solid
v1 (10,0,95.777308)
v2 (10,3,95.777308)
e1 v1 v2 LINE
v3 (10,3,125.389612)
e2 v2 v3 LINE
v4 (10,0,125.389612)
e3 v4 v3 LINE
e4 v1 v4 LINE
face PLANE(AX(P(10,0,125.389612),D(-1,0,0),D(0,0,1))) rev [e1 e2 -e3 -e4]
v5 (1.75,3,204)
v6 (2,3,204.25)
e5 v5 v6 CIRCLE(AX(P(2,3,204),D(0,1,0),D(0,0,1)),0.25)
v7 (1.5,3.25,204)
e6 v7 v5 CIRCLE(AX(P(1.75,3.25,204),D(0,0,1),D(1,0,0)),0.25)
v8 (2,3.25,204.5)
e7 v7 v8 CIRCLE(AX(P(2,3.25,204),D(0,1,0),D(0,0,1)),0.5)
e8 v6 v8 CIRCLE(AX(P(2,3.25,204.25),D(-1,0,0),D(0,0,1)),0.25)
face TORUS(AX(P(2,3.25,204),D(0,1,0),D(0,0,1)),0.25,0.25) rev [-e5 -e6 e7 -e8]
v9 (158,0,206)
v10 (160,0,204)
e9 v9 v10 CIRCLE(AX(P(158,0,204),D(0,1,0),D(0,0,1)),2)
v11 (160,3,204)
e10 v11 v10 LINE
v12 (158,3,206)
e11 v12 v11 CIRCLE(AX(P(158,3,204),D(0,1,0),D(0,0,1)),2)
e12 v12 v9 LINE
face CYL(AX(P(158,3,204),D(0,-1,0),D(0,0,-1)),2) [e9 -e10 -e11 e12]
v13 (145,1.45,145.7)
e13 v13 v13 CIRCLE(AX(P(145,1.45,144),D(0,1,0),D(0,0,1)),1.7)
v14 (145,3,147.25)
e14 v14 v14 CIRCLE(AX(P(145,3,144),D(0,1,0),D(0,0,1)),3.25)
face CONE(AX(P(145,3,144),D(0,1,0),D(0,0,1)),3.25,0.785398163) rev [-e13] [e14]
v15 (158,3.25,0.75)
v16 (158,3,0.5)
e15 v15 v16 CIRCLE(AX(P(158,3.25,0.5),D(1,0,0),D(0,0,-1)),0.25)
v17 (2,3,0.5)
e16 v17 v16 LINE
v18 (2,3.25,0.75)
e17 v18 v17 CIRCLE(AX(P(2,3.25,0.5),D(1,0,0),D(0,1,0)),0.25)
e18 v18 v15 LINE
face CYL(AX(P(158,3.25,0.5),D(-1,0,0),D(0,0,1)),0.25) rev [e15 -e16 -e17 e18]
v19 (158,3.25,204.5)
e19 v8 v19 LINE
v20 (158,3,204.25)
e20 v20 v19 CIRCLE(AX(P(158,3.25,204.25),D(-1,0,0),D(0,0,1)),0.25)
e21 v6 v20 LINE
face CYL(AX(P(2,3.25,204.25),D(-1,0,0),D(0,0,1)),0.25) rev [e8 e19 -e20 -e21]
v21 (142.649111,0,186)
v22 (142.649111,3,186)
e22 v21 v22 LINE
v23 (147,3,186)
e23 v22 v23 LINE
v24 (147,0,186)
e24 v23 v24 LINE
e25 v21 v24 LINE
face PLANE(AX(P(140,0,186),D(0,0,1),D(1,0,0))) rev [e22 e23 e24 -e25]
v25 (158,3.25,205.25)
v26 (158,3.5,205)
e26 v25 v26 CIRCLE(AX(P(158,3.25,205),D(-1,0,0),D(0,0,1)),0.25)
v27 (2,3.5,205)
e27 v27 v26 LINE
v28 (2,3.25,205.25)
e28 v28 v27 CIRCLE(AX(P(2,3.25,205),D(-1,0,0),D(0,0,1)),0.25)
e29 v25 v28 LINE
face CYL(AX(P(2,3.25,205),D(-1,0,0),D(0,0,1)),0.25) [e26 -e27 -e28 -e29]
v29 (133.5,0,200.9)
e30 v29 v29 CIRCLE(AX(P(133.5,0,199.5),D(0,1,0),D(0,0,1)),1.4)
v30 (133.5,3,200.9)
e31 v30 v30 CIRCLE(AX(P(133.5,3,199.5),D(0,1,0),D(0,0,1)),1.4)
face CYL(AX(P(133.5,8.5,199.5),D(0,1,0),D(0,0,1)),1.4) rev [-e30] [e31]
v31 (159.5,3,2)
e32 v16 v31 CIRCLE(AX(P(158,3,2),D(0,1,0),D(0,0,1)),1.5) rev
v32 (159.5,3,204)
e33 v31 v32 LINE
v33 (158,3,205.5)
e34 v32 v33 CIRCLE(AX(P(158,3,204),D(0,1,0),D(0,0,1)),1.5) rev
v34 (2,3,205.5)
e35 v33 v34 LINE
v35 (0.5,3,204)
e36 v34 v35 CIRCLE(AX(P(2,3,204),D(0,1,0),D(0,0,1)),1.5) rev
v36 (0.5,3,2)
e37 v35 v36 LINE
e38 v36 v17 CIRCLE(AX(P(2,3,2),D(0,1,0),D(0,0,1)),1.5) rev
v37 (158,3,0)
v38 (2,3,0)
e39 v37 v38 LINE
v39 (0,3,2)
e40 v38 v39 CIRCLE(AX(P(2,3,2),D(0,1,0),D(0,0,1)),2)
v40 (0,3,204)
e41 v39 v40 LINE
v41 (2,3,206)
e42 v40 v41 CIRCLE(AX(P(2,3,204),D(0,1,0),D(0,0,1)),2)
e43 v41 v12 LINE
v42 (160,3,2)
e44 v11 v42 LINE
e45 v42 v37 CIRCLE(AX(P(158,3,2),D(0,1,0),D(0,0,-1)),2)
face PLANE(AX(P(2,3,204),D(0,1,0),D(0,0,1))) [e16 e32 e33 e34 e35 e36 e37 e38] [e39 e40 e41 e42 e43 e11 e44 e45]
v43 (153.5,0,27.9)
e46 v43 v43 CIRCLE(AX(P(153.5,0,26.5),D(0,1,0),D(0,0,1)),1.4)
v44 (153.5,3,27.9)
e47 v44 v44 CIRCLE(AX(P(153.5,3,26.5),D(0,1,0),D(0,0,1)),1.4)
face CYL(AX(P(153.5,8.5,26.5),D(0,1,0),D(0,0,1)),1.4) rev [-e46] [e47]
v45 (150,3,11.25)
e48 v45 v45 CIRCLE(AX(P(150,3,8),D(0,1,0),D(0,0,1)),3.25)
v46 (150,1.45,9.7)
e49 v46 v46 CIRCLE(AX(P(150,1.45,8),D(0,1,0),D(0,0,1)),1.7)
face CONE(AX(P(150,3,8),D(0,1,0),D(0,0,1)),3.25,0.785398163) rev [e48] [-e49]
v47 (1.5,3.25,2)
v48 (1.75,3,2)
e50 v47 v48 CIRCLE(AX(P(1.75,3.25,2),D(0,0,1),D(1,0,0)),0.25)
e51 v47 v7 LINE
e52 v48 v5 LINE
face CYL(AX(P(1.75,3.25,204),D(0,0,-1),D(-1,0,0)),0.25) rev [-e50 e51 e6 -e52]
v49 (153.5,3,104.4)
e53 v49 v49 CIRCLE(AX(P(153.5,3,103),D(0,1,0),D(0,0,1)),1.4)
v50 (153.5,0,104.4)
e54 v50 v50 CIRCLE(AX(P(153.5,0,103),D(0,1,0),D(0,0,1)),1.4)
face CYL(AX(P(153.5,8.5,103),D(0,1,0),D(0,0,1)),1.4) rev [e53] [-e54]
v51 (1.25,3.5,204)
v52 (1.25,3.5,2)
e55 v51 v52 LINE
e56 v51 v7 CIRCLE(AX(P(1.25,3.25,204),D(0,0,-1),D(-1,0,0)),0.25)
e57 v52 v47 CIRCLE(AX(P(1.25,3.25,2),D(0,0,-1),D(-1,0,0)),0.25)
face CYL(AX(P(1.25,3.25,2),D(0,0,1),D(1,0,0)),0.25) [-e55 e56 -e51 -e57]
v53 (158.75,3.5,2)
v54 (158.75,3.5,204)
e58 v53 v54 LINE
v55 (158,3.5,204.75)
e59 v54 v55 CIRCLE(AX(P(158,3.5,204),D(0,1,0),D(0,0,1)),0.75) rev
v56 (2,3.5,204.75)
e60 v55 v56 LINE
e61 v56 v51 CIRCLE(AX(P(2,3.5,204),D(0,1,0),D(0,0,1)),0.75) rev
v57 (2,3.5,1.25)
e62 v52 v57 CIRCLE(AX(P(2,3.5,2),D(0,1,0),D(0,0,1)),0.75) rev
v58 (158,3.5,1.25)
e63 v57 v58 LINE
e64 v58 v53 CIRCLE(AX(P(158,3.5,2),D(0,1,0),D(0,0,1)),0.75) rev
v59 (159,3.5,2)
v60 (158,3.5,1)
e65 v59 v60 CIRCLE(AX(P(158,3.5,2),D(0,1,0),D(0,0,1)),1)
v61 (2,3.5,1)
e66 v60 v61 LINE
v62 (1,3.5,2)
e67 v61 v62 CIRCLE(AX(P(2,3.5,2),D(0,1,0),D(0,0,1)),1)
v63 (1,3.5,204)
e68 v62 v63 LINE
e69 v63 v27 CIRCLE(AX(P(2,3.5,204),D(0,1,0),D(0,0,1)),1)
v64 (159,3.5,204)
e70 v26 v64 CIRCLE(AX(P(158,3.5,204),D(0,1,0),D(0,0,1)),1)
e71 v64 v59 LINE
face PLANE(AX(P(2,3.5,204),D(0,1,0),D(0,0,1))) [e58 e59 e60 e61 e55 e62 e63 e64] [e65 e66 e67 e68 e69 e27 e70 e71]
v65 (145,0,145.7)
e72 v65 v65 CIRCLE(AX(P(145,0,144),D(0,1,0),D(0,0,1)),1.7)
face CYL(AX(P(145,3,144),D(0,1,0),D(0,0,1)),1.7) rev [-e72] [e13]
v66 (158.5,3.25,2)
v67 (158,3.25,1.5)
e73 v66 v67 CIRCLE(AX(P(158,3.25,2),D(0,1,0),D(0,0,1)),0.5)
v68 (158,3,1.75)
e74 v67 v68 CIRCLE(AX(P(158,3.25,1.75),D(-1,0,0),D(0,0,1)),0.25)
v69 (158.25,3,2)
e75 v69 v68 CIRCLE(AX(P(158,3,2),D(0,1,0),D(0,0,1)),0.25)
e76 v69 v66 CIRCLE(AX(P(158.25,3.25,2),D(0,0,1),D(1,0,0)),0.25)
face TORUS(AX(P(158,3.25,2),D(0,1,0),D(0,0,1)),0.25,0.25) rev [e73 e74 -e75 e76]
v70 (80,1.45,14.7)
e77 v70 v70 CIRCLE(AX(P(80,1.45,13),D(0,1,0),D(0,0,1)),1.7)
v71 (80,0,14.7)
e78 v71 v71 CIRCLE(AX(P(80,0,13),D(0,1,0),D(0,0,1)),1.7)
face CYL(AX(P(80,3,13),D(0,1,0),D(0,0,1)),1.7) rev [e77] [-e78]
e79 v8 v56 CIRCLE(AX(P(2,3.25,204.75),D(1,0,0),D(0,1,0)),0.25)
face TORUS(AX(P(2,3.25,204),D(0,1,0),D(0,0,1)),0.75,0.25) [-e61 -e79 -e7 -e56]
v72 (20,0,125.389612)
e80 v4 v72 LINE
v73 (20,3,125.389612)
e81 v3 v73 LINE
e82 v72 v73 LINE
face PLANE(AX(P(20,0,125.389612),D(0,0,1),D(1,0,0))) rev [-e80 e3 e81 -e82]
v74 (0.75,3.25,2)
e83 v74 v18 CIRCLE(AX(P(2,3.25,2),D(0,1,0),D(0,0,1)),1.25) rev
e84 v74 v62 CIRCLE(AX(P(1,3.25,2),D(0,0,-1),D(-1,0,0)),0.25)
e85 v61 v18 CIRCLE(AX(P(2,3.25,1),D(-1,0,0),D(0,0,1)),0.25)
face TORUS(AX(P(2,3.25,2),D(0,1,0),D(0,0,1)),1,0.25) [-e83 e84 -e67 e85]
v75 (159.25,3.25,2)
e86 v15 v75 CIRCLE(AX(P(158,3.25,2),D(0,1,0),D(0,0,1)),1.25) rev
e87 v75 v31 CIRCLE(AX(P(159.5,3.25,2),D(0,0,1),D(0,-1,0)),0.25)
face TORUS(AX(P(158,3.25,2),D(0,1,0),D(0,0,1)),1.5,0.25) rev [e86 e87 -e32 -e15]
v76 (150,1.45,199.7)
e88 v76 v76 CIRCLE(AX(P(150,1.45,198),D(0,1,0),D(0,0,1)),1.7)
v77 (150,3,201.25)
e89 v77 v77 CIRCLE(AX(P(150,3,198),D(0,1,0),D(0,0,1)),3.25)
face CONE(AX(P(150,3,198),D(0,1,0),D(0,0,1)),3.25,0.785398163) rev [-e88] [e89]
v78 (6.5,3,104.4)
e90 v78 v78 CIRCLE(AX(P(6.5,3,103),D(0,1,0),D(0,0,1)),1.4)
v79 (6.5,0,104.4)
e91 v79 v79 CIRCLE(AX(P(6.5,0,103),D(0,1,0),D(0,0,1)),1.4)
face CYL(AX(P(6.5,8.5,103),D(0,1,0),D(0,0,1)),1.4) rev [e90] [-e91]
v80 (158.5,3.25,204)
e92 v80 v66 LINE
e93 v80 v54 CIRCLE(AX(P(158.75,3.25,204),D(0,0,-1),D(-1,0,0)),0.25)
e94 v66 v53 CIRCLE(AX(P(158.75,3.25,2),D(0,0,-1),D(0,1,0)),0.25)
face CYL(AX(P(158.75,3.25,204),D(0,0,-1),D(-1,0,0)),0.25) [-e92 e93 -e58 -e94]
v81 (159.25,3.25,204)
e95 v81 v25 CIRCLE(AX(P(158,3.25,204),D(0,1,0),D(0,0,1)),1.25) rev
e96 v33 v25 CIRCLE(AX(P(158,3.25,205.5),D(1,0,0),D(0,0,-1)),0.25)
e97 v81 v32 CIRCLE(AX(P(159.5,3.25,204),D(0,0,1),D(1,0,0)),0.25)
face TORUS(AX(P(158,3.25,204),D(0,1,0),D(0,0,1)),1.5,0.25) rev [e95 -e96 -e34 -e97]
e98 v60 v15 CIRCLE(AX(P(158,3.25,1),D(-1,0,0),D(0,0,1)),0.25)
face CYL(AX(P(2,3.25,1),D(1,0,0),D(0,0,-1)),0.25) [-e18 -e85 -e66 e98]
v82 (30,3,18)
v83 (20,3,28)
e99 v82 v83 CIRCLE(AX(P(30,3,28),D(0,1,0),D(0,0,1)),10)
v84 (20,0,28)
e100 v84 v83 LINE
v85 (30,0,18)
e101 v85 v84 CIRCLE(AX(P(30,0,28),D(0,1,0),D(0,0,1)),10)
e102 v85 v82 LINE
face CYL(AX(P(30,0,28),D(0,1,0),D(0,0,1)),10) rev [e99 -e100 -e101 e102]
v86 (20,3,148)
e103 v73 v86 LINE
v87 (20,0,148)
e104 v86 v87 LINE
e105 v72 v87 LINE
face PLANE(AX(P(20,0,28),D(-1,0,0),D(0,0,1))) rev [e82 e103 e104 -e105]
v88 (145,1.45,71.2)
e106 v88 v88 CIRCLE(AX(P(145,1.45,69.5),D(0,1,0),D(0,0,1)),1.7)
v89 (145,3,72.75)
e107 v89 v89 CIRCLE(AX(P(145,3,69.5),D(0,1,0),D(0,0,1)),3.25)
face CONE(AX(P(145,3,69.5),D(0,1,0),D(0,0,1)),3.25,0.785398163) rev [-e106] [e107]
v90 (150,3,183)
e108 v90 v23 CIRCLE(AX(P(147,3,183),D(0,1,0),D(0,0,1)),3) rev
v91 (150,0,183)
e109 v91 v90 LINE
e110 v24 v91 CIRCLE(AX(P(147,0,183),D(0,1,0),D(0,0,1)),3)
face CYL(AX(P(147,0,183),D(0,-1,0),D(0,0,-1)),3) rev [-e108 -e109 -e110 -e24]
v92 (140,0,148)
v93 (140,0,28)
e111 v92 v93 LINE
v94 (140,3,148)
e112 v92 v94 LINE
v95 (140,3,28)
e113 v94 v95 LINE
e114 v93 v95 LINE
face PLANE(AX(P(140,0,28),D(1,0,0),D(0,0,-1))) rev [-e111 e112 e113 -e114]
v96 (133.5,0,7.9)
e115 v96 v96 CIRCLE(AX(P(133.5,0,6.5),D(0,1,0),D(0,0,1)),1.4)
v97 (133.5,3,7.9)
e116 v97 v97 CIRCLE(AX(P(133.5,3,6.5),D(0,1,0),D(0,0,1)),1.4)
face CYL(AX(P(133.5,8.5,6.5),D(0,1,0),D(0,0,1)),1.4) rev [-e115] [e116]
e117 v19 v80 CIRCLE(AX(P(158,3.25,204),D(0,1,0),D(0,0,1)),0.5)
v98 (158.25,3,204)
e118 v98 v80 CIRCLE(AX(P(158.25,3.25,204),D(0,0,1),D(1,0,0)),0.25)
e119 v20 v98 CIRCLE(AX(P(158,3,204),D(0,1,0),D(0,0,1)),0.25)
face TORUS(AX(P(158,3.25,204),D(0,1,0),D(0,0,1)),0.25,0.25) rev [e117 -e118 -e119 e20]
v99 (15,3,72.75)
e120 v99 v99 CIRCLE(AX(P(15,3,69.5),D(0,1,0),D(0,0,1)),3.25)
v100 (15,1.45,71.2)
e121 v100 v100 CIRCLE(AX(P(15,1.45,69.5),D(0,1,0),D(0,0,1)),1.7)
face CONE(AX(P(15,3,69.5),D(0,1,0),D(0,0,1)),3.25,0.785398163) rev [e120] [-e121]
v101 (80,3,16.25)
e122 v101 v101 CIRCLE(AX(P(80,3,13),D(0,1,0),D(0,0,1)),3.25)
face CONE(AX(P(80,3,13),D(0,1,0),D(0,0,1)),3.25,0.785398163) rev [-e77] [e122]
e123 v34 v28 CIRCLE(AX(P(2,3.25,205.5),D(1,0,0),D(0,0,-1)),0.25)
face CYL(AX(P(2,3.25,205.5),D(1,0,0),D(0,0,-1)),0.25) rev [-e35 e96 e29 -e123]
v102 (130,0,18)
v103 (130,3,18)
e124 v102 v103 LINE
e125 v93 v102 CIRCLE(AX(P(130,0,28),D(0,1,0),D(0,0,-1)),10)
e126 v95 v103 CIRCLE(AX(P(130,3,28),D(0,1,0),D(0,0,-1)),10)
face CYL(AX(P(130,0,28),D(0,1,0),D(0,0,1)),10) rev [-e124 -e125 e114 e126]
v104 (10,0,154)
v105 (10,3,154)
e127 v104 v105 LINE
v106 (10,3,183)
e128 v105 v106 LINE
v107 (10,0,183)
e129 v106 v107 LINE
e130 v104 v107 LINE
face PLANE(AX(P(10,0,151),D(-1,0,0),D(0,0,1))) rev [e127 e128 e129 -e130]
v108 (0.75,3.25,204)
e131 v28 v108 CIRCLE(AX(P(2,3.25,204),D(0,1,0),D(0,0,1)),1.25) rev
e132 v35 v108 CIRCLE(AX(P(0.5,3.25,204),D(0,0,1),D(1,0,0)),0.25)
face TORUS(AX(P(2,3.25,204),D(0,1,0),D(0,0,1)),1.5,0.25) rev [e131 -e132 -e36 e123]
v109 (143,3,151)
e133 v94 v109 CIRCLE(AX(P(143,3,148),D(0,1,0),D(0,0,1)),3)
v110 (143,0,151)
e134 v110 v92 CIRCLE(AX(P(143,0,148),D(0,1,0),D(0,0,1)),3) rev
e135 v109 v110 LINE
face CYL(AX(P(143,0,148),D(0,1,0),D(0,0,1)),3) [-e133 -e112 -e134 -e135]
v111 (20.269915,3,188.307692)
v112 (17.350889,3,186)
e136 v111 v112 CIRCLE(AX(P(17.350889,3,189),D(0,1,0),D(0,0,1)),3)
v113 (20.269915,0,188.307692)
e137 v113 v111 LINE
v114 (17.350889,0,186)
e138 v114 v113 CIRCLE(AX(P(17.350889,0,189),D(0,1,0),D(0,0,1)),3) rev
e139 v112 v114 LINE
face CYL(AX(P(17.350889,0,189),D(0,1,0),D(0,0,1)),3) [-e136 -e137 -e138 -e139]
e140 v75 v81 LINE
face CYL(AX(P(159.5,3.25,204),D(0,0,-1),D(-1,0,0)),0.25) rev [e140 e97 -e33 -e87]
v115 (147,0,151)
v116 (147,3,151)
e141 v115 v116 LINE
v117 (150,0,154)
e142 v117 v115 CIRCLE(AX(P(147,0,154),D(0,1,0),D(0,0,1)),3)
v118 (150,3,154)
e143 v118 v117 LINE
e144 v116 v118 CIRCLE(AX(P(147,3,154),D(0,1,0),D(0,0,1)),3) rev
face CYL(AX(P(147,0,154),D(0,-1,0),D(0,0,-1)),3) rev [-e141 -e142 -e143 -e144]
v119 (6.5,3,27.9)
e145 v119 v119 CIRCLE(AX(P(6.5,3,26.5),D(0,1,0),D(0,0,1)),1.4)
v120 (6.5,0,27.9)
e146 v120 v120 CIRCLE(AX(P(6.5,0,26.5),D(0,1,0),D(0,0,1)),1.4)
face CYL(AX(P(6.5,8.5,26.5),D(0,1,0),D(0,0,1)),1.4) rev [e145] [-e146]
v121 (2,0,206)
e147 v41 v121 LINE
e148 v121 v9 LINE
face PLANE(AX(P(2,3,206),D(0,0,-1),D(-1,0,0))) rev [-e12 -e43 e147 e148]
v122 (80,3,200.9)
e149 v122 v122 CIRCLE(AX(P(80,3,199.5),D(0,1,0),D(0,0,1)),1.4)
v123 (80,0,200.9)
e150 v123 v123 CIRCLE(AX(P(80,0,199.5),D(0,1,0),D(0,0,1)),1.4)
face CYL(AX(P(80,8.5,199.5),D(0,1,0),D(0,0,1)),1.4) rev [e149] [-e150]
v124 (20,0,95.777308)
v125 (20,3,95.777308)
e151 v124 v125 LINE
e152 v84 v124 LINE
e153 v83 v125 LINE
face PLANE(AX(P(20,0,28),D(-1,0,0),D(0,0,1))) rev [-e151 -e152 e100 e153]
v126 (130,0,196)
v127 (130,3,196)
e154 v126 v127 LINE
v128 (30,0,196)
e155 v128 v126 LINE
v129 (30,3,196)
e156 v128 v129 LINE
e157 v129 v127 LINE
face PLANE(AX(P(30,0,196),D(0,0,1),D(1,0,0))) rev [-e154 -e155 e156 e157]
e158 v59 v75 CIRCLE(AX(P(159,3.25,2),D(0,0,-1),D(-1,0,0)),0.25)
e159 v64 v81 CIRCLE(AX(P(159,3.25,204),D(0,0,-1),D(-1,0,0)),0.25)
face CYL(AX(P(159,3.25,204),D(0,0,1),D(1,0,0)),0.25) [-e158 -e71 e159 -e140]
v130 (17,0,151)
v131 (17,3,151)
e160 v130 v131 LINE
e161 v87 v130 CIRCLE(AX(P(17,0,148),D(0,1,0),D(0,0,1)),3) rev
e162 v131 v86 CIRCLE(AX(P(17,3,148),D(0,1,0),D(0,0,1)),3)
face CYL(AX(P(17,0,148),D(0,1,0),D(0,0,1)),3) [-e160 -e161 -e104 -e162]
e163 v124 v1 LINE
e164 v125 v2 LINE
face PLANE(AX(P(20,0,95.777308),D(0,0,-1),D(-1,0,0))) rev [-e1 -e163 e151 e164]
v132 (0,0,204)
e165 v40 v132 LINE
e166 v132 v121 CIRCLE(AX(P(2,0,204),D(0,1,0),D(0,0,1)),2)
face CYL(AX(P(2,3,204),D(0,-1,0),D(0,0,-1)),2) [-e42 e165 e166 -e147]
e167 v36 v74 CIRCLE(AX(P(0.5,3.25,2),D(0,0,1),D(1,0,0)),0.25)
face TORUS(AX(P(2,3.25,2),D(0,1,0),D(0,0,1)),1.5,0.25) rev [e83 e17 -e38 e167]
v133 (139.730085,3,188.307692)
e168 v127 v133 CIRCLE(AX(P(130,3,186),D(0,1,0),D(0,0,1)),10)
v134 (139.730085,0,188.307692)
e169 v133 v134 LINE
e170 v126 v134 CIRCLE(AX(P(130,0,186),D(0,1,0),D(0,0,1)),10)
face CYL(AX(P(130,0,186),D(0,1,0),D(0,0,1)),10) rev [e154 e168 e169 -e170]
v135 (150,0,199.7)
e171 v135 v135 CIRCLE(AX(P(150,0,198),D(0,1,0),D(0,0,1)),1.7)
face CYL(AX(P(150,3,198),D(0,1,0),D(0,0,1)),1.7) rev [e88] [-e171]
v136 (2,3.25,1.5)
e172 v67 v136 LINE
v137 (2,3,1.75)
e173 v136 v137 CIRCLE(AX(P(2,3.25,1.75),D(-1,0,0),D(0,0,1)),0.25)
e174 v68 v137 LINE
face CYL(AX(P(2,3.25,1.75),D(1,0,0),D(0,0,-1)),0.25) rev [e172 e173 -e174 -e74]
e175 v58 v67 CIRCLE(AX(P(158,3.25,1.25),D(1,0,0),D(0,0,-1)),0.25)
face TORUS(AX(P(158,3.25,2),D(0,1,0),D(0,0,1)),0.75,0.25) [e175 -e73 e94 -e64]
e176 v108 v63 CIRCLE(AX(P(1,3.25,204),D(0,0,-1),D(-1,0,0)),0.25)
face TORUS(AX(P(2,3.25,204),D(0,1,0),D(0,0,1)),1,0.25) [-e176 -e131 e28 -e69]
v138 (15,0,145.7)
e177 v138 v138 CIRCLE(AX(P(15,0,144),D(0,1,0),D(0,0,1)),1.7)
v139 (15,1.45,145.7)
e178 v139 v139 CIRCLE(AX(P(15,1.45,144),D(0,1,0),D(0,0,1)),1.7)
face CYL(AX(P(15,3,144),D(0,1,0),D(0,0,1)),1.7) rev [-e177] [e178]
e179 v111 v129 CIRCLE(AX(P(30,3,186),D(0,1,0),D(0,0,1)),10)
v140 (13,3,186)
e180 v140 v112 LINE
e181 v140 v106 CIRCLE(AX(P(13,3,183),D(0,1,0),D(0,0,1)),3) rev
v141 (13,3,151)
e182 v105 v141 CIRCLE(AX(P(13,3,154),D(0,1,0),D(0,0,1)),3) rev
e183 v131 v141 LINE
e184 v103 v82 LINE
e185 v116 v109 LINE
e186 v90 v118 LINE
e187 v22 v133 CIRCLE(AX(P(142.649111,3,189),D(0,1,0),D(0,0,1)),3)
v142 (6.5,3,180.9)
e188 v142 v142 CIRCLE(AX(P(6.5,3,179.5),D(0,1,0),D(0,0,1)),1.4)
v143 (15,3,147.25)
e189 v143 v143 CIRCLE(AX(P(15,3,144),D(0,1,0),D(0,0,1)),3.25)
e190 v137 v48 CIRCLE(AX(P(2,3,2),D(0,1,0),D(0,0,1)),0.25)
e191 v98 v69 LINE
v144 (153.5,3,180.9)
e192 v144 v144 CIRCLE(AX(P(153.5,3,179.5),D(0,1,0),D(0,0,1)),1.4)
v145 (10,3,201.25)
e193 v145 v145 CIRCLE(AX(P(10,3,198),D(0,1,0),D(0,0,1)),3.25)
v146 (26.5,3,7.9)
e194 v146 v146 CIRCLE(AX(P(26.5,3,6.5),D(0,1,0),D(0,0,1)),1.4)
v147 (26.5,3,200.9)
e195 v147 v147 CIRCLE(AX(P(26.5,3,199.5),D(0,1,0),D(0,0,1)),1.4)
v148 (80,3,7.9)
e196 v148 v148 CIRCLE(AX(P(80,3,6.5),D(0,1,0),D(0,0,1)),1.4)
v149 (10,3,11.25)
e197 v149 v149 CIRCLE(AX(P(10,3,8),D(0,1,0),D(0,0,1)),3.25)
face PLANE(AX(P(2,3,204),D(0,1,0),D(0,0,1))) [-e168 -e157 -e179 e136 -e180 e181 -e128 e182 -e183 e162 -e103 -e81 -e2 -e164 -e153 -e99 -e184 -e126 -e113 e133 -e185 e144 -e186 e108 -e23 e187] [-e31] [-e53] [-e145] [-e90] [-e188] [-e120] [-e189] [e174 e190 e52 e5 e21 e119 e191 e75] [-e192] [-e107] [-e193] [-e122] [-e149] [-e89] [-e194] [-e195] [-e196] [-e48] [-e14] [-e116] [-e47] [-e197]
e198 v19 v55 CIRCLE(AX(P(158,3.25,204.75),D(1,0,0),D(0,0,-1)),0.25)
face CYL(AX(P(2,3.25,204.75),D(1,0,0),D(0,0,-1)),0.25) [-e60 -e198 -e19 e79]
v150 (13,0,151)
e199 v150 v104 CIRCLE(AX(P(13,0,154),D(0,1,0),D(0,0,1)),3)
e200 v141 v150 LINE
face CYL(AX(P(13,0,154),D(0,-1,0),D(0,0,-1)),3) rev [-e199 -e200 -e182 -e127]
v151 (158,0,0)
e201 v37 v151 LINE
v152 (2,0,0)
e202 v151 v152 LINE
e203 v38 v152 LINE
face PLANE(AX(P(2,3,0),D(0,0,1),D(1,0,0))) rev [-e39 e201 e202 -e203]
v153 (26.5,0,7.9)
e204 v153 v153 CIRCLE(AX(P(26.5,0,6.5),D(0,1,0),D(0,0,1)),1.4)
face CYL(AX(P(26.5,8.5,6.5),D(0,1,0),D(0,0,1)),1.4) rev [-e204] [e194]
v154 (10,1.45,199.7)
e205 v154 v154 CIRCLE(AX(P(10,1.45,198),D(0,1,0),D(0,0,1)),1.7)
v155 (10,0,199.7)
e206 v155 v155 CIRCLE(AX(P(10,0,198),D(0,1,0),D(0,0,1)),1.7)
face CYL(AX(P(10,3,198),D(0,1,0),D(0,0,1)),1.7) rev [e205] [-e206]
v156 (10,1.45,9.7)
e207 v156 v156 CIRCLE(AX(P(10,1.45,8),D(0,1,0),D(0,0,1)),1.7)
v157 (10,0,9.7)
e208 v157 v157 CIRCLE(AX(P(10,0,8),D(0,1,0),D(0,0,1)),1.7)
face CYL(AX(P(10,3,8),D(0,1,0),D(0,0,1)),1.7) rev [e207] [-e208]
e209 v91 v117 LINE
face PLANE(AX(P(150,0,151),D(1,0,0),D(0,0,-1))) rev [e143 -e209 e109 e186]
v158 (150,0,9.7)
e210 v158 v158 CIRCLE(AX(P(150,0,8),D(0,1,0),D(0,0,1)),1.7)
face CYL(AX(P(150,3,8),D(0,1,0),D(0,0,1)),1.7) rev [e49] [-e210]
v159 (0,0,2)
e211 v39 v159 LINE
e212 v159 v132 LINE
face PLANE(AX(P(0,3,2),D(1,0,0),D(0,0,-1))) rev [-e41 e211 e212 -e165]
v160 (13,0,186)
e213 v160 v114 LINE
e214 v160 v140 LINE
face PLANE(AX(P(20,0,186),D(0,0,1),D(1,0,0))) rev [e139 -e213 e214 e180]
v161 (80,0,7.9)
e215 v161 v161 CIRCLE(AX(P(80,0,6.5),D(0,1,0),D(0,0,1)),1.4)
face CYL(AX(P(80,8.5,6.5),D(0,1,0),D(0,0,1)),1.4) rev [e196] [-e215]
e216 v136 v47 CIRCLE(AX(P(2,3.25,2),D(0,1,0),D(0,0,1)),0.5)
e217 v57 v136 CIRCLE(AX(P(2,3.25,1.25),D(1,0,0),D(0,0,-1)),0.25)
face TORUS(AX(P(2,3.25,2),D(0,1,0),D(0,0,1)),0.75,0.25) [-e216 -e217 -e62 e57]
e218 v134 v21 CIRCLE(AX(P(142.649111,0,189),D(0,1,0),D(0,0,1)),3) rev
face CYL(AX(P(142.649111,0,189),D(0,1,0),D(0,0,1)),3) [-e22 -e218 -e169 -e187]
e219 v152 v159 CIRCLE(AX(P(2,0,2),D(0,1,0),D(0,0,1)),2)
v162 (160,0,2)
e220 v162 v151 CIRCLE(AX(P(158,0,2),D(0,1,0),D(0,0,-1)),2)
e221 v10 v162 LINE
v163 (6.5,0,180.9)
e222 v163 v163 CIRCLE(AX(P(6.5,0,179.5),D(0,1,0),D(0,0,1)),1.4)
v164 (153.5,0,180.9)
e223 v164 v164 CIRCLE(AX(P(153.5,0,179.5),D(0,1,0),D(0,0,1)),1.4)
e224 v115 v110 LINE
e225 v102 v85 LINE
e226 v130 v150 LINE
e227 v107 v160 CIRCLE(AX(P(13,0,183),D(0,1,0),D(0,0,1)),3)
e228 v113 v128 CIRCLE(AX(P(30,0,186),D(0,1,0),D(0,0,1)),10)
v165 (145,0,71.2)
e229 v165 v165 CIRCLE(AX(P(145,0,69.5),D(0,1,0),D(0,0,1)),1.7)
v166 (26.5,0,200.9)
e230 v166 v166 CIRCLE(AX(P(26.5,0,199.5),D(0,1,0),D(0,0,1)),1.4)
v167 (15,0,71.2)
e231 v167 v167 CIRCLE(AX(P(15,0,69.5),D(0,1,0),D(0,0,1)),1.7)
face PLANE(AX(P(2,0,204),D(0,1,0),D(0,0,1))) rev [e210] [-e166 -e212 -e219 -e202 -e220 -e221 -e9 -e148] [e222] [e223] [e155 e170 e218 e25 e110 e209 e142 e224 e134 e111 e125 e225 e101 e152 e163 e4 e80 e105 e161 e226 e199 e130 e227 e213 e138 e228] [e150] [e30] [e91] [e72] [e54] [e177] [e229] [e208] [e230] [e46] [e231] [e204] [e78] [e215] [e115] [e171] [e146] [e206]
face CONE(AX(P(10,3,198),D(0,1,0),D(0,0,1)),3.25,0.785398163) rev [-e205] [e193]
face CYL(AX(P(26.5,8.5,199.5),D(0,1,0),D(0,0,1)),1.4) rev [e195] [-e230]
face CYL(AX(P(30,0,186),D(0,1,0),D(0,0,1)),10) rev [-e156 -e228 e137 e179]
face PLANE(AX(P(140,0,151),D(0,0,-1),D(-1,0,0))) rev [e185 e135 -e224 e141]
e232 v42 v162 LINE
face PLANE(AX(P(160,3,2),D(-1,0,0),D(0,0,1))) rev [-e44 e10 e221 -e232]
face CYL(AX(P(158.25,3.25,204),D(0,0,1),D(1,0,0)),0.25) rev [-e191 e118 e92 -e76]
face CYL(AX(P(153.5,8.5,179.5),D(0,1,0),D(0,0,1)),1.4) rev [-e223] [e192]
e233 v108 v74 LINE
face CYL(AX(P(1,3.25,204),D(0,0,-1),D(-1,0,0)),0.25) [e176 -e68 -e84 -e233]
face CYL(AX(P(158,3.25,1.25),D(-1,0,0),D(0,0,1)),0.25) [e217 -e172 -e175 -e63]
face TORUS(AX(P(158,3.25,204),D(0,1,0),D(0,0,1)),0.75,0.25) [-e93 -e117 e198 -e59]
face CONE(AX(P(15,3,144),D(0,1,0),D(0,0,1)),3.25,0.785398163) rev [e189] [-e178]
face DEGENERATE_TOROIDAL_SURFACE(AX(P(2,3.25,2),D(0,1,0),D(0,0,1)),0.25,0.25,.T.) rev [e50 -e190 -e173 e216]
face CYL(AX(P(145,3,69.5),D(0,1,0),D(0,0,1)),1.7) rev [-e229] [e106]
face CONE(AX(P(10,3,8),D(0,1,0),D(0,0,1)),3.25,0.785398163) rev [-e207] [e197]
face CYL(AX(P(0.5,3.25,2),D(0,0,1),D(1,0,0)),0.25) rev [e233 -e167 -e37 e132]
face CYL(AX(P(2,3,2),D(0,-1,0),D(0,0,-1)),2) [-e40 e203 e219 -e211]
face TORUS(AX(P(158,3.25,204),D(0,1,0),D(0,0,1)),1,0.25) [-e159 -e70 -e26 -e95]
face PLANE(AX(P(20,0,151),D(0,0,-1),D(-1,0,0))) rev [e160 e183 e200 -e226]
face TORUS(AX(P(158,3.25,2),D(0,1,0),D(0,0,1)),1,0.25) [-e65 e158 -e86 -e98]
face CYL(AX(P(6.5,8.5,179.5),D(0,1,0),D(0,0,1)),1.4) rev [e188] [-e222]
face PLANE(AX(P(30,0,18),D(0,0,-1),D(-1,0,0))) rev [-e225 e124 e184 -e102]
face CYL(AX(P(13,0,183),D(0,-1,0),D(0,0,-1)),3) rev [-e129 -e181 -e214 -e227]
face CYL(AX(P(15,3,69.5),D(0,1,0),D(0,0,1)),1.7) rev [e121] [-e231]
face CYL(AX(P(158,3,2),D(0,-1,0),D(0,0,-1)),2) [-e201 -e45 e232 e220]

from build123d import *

# Parameters (mm, degrees)
BOSS_EXTRUDE1_DEPTH                            = 3
CSK_FOR_M3_FLAT_HEAD_MACHINE_SCREW1_AT_2_COUNT = 2
CSK_FOR_M3_FLAT_HEAD_MACHINE_SCREW1_AT_2_PITCH = 70.178344238
CSK_FOR_M3_FLAT_HEAD_MACHINE_SCREW1_AT_3_COUNT = 2
CSK_FOR_M3_FLAT_HEAD_MACHINE_SCREW1_AT_3_PITCH = 140
CSK_FOR_M3_FLAT_HEAD_MACHINE_SCREW1_AT_4_COUNT = 2
CSK_FOR_M3_FLAT_HEAD_MACHINE_SCREW1_AT_4_PITCH = 148.348407474
CSK_FOR_M3_FLAT_HEAD_MACHINE_SCREW1_AT_5_COUNT = 2
CSK_FOR_M3_FLAT_HEAD_MACHINE_SCREW1_AT_5_PITCH = 61.702917273
CSK_FOR_M3_FLAT_HEAD_MACHINE_SCREW1_AT_6_COUNT = 2
CSK_FOR_M3_FLAT_HEAD_MACHINE_SCREW1_AT_6_PITCH = 136.091880728
CSK_FOR_M3_FLAT_HEAD_MACHINE_SCREW1_AT_7_COUNT = 2
CSK_FOR_M3_FLAT_HEAD_MACHINE_SCREW1_AT_7_PITCH = 190
CSK_FOR_M3_FLAT_HEAD_MACHINE_SCREW1_AT_8_COUNT = 2
CSK_FOR_M3_FLAT_HEAD_MACHINE_SCREW1_AT_8_PITCH = 236.008474424
CSK_FOR_M3_FLAT_HEAD_MACHINE_SCREW1_AT_9_COUNT = 2
CSK_FOR_M3_FLAT_HEAD_MACHINE_SCREW1_AT_9_PITCH = 191.627242322
CUT_EXTRUDE8_DEPTH                             = 261.854365499
SKETCH15_W                                     = 10
SKETCH15_H                                     = 35
CUT_EXTRUDE9_DEPTH                             = 261.854365499
FILLET5_R                                      = 3
BOSS_EXTRUDE2_DEPTH                            = 0.5
FILLET6_R                                      = 0.25
F_3_0MM_DOWEL_HOLE1_D                          = 2.8
F_3_0MM_DOWEL_HOLE1_ON_FACE_2_D                = 2.8
F_3_0MM_DOWEL_HOLE1_ON_FACE_3_D                = 2.8
SKETCH22_W                                     = 10
SKETCH22_H                                     = 29.612304697
CUT_EXTRUDE10_DEPTH                            = 261.854365499


with BuildPart() as part:
    # Sketch1 → Boss-Extrude1 (new body)
    with BuildSketch(Plane(origin=(0, 0, 0), x_dir=(1, 0, 0), z_dir=(0, 1, 0))):
        with BuildLine():
            Line((2, 0), (158, 0))
            ThreePointArc((158, 0), (159.414213562, -0.585786438), (160, -2))
            Line((160, -2), (160, -204))
            ThreePointArc((160, -204), (159.414213562, -205.414213562), (158, -206))
            Line((158, -206), (2, -206))
            ThreePointArc((2, -206), (0.585786438, -205.414213562), (0, -204))
            Line((0, -204), (0, -2))
            ThreePointArc((0, -2), (0.585786438, -0.585786438), (2, 0))
        make_face()
    extrude(amount=BOSS_EXTRUDE1_DEPTH)

    # Sketch13 → CSK for M3 Flat Head Machine Screw1 (revolve, cut)
    with BuildSketch(Plane(origin=(10, 3, 8), x_dir=(0, 0, 1), z_dir=(1, 0, 0))):
        Polygon((0, 0), (0, 3), (1.7, 3), (1.7, 1.55), (3.25, 0), align=None)
    csk_for_m3_flat_head_machine_screw1 = revolve(axis=Axis((10, 9.35, 8), (0, -1, 0)), mode=Mode.SUBTRACT)

    # CSK for M3 Flat Head Machine Screw1 at 2: CSK for M3 Flat Head Machine Screw1 ×2
    with Locations(*[Vector(0.9974586998307351, 0, 0.07124704998790932) * (i * CSK_FOR_M3_FLAT_HEAD_MACHINE_SCREW1_AT_2_PITCH) for i in range(1, CSK_FOR_M3_FLAT_HEAD_MACHINE_SCREW1_AT_2_COUNT)]):
        add(csk_for_m3_flat_head_machine_screw1, mode=Mode.SUBTRACT)

    # CSK for M3 Flat Head Machine Screw1 at 3: CSK for M3 Flat Head Machine Screw1 ×2
    with Locations(*[(i * CSK_FOR_M3_FLAT_HEAD_MACHINE_SCREW1_AT_3_PITCH, 0, 0) for i in range(1, CSK_FOR_M3_FLAT_HEAD_MACHINE_SCREW1_AT_3_COUNT)]):
        add(csk_for_m3_flat_head_machine_screw1, mode=Mode.SUBTRACT)

    # CSK for M3 Flat Head Machine Screw1 at 4: CSK for M3 Flat Head Machine Screw1 ×2
    with Locations(*[Vector(0.9100198802193487, 0, 0.41456461209992634) * (i * CSK_FOR_M3_FLAT_HEAD_MACHINE_SCREW1_AT_4_PITCH) for i in range(1, CSK_FOR_M3_FLAT_HEAD_MACHINE_SCREW1_AT_4_COUNT)]):
        add(csk_for_m3_flat_head_machine_screw1, mode=Mode.SUBTRACT)

    # CSK for M3 Flat Head Machine Screw1 at 5: CSK for M3 Flat Head Machine Screw1 ×2
    with Locations(*[Vector(0.08103344575876159, 0, 0.9967113828327947) * (i * CSK_FOR_M3_FLAT_HEAD_MACHINE_SCREW1_AT_5_PITCH) for i in range(1, CSK_FOR_M3_FLAT_HEAD_MACHINE_SCREW1_AT_5_COUNT)]):
        add(csk_for_m3_flat_head_machine_screw1, mode=Mode.SUBTRACT)

    # CSK for M3 Flat Head Machine Screw1 at 6: CSK for M3 Flat Head Machine Screw1 ×2
    with Locations(*[Vector(0.036739884651930246, 0, 0.9993248625325815) * (i * CSK_FOR_M3_FLAT_HEAD_MACHINE_SCREW1_AT_6_PITCH) for i in range(1, CSK_FOR_M3_FLAT_HEAD_MACHINE_SCREW1_AT_6_COUNT)]):
        add(csk_for_m3_flat_head_machine_screw1, mode=Mode.SUBTRACT)

    # CSK for M3 Flat Head Machine Screw1 at 7: CSK for M3 Flat Head Machine Screw1 ×2
    with Locations(*[(0, 0, i * CSK_FOR_M3_FLAT_HEAD_MACHINE_SCREW1_AT_7_PITCH) for i in range(1, CSK_FOR_M3_FLAT_HEAD_MACHINE_SCREW1_AT_7_COUNT)]):
        add(csk_for_m3_flat_head_machine_screw1, mode=Mode.SUBTRACT)

    # CSK for M3 Flat Head Machine Screw1 at 8: CSK for M3 Flat Head Machine Screw1 ×2
    with Locations(*[Vector(0.5931990380498493, 0, 0.8050558373533686) * (i * CSK_FOR_M3_FLAT_HEAD_MACHINE_SCREW1_AT_8_PITCH) for i in range(1, CSK_FOR_M3_FLAT_HEAD_MACHINE_SCREW1_AT_8_COUNT)]):
        add(csk_for_m3_flat_head_machine_screw1, mode=Mode.SUBTRACT)

    # CSK for M3 Flat Head Machine Screw1 at 9: CSK for M3 Flat Head Machine Screw1 ×2
    with Locations(*[Vector(0.7044927347701055, 0, 0.7097111994721077) * (i * CSK_FOR_M3_FLAT_HEAD_MACHINE_SCREW1_AT_9_PITCH) for i in range(1, CSK_FOR_M3_FLAT_HEAD_MACHINE_SCREW1_AT_9_COUNT)]):
        add(csk_for_m3_flat_head_machine_screw1, mode=Mode.SUBTRACT)

    # Sketch14 → Cut-Extrude8 (cut, through all)
    with BuildSketch(Plane(origin=(0, 3, 0), x_dir=(1, 0, 0), z_dir=(0, 1, 0))):
        with BuildLine():
            Line((30, -18), (130, -18))
            ThreePointArc((130, -18), (137.071067812, -20.928932188), (140, -28))
            Line((140, -28), (140, -186))
            ThreePointArc((140, -186), (137.071067812, -193.071067812), (130, -196))
            Line((130, -196), (30, -196))
            ThreePointArc((30, -196), (22.928932188, -193.071067812), (20, -186))
            Line((20, -186), (20, -28))
            ThreePointArc((20, -28), (22.928932188, -20.928932188), (30, -18))
        make_face()
    extrude(amount=-CUT_EXTRUDE8_DEPTH, mode=Mode.SUBTRACT)

    # Sketch15 → Cut-Extrude9 (cut, through all)
    with BuildSketch(Plane(origin=(0, 3, 0), x_dir=(1, 0, 0), z_dir=(0, 1, 0))):
        with Locations((15, -168.5)):
            Rectangle(SKETCH15_W, SKETCH15_H)
        with Locations((145, -168.5)):
            Rectangle(SKETCH15_W, SKETCH15_H)
    extrude(amount=-CUT_EXTRUDE9_DEPTH, mode=Mode.SUBTRACT)

    # Fillet5
    fillet5_edges = [part.edges().sort_by_distance(p)[0] for p in [
        (20, 1.5, 186),
        (140, 1.5, 186),
        (20, 1.5, 151),
        (10, 1.5, 186),
        (10, 1.5, 151),
        (140, 1.5, 151),
        (150, 1.5, 151),
        (150, 1.5, 186),
    ]]
    fillet(fillet5_edges, radius=FILLET5_R)

    # Sketch18 → Boss-Extrude2 (add)
    with BuildSketch(Plane(origin=(0, 3, 0), x_dir=(1, 0, 0), z_dir=(0, 1, 0))):
        with BuildLine():
            Line((2, -205.25), (158, -205.25))
            ThreePointArc((158, -205.25), (158.883883476, -204.883883476), (159.25, -204))
            Line((159.25, -204), (159.25, -2))
            ThreePointArc((159.25, -2), (158.883883476, -1.116116524), (158, -0.75))
            Line((158, -0.75), (2, -0.75))
            ThreePointArc((2, -0.75), (1.116116524, -1.116116524), (0.75, -2))
            Line((0.75, -2), (0.75, -204))
            ThreePointArc((0.75, -204), (1.116116524, -204.883883476), (2, -205.25))
        make_face()
        with BuildLine():
            Line((2, -204.5), (158, -204.5))
            ThreePointArc((158, -204.5), (158.353553391, -204.353553391), (158.5, -204))
            Line((158.5, -204), (158.5, -2))
            ThreePointArc((158.5, -2), (158.353553391, -1.646446609), (158, -1.5))
            Line((158, -1.5), (2, -1.5))
            ThreePointArc((2, -1.5), (1.646446609, -1.646446609), (1.5, -2))
            Line((1.5, -2), (1.5, -204))
            ThreePointArc((1.5, -204), (1.646446609, -204.353553391), (2, -204.5))
        make_face(mode=Mode.SUBTRACT)
    extrude(amount=BOSS_EXTRUDE2_DEPTH)

    # Fillet6
    fillet6_edges = [part.edges().sort_by_distance(p)[0] for p in [
        (1.116116524, 3, 1.116116524),
        (80, 3, 0.75),
        (158.883883476, 3, 1.116116524),
        (159.25, 3, 103),
        (158.883883476, 3, 204.883883476),
        (80, 3, 205.25),
        (1.116116524, 3, 204.883883476),
        (158.353553391, 3, 1.646446609),
        (158.5, 3, 103),
        (158.353553391, 3, 204.353553391),
        (80, 3, 204.5),
        (1.646446609, 3, 204.353553391),
        (1.5, 3, 103),
        (1.646446609, 3, 1.646446609),
        (0.75, 3, 103),
        (80, 3, 1.5),
    ]]
    fillet(fillet6_edges, radius=FILLET6_R)
    fillet6_2_edges = [part.edges().sort_by_distance(p)[0] for p in [
        (80, 3.5, 1.5),
        (158.353553391, 3.5, 1.646446609),
        (158.5, 3.5, 103),
        (158.353553391, 3.5, 204.353553391),
        (80, 3.5, 204.5),
        (1.646446609, 3.5, 204.353553391),
        (1.5, 3.5, 103),
        (80, 3.5, 0.75),
        (158.883883476, 3.5, 1.116116524),
        (159.25, 3.5, 103),
        (158.883883476, 3.5, 204.883883476),
        (80, 3.5, 205.25),
        (1.116116524, 3.5, 204.883883476),
        (0.75, 3.5, 103),
        (1.646446609, 3.5, 1.646446609),
        (1.116116524, 3.5, 1.116116524),
    ]]
    fillet(fillet6_2_edges, radius=FILLET6_R - 0.0001)  # a hair under: the kernel refuses the full size

    # Ø3.0mm Dowel Hole1 (through all)
    with Locations(Plane(origin=(133.5, 3, 6.5), x_dir=(0, 0, -1), z_dir=(0, -1, 0))):
        with Locations((0, 0)):
            Hole(F_3_0MM_DOWEL_HOLE1_D / 2)

    # Ø3.0mm Dowel Hole1 on face 2 (through all)
    with Locations(Plane(origin=(80, 8.5, 6.5), x_dir=(0, 0, -1), z_dir=(0, -1, 0))):
        with Locations((0, 0), (-20, -73.5), (-96.5, -73.5), (-173, -73.5), (-193, 0), (-173, 73.5), (-96.5, 73.5), (0, 53.5), (-20, 73.5), (0, -53.5), (-193, -53.5), (-193, 53.5)):
            Hole(F_3_0MM_DOWEL_HOLE1_ON_FACE_2_D / 2)

    # Ø3.0mm Dowel Hole1 on face 3 (through all)
    with Locations(Plane(origin=(26.5, 3, 6.5), x_dir=(0, 0, 1), z_dir=(0, 1, 0))):
        with Locations((0, 0), (193, 0), (193, 107), (20, 127)):
            Hole(F_3_0MM_DOWEL_HOLE1_ON_FACE_3_D / 2)

    # Sketch22 → Cut-Extrude10 (cut, through all)
    with BuildSketch(Plane(origin=(0, 3, 0), x_dir=(1, 0, 0), z_dir=(0, 1, 0))):
        with Locations((15, -110.583459859)):
            Rectangle(SKETCH22_W, SKETCH22_H)
    extrude(amount=-CUT_EXTRUDE10_DEPTH, mode=Mode.SUBTRACT)


solid = part.part
